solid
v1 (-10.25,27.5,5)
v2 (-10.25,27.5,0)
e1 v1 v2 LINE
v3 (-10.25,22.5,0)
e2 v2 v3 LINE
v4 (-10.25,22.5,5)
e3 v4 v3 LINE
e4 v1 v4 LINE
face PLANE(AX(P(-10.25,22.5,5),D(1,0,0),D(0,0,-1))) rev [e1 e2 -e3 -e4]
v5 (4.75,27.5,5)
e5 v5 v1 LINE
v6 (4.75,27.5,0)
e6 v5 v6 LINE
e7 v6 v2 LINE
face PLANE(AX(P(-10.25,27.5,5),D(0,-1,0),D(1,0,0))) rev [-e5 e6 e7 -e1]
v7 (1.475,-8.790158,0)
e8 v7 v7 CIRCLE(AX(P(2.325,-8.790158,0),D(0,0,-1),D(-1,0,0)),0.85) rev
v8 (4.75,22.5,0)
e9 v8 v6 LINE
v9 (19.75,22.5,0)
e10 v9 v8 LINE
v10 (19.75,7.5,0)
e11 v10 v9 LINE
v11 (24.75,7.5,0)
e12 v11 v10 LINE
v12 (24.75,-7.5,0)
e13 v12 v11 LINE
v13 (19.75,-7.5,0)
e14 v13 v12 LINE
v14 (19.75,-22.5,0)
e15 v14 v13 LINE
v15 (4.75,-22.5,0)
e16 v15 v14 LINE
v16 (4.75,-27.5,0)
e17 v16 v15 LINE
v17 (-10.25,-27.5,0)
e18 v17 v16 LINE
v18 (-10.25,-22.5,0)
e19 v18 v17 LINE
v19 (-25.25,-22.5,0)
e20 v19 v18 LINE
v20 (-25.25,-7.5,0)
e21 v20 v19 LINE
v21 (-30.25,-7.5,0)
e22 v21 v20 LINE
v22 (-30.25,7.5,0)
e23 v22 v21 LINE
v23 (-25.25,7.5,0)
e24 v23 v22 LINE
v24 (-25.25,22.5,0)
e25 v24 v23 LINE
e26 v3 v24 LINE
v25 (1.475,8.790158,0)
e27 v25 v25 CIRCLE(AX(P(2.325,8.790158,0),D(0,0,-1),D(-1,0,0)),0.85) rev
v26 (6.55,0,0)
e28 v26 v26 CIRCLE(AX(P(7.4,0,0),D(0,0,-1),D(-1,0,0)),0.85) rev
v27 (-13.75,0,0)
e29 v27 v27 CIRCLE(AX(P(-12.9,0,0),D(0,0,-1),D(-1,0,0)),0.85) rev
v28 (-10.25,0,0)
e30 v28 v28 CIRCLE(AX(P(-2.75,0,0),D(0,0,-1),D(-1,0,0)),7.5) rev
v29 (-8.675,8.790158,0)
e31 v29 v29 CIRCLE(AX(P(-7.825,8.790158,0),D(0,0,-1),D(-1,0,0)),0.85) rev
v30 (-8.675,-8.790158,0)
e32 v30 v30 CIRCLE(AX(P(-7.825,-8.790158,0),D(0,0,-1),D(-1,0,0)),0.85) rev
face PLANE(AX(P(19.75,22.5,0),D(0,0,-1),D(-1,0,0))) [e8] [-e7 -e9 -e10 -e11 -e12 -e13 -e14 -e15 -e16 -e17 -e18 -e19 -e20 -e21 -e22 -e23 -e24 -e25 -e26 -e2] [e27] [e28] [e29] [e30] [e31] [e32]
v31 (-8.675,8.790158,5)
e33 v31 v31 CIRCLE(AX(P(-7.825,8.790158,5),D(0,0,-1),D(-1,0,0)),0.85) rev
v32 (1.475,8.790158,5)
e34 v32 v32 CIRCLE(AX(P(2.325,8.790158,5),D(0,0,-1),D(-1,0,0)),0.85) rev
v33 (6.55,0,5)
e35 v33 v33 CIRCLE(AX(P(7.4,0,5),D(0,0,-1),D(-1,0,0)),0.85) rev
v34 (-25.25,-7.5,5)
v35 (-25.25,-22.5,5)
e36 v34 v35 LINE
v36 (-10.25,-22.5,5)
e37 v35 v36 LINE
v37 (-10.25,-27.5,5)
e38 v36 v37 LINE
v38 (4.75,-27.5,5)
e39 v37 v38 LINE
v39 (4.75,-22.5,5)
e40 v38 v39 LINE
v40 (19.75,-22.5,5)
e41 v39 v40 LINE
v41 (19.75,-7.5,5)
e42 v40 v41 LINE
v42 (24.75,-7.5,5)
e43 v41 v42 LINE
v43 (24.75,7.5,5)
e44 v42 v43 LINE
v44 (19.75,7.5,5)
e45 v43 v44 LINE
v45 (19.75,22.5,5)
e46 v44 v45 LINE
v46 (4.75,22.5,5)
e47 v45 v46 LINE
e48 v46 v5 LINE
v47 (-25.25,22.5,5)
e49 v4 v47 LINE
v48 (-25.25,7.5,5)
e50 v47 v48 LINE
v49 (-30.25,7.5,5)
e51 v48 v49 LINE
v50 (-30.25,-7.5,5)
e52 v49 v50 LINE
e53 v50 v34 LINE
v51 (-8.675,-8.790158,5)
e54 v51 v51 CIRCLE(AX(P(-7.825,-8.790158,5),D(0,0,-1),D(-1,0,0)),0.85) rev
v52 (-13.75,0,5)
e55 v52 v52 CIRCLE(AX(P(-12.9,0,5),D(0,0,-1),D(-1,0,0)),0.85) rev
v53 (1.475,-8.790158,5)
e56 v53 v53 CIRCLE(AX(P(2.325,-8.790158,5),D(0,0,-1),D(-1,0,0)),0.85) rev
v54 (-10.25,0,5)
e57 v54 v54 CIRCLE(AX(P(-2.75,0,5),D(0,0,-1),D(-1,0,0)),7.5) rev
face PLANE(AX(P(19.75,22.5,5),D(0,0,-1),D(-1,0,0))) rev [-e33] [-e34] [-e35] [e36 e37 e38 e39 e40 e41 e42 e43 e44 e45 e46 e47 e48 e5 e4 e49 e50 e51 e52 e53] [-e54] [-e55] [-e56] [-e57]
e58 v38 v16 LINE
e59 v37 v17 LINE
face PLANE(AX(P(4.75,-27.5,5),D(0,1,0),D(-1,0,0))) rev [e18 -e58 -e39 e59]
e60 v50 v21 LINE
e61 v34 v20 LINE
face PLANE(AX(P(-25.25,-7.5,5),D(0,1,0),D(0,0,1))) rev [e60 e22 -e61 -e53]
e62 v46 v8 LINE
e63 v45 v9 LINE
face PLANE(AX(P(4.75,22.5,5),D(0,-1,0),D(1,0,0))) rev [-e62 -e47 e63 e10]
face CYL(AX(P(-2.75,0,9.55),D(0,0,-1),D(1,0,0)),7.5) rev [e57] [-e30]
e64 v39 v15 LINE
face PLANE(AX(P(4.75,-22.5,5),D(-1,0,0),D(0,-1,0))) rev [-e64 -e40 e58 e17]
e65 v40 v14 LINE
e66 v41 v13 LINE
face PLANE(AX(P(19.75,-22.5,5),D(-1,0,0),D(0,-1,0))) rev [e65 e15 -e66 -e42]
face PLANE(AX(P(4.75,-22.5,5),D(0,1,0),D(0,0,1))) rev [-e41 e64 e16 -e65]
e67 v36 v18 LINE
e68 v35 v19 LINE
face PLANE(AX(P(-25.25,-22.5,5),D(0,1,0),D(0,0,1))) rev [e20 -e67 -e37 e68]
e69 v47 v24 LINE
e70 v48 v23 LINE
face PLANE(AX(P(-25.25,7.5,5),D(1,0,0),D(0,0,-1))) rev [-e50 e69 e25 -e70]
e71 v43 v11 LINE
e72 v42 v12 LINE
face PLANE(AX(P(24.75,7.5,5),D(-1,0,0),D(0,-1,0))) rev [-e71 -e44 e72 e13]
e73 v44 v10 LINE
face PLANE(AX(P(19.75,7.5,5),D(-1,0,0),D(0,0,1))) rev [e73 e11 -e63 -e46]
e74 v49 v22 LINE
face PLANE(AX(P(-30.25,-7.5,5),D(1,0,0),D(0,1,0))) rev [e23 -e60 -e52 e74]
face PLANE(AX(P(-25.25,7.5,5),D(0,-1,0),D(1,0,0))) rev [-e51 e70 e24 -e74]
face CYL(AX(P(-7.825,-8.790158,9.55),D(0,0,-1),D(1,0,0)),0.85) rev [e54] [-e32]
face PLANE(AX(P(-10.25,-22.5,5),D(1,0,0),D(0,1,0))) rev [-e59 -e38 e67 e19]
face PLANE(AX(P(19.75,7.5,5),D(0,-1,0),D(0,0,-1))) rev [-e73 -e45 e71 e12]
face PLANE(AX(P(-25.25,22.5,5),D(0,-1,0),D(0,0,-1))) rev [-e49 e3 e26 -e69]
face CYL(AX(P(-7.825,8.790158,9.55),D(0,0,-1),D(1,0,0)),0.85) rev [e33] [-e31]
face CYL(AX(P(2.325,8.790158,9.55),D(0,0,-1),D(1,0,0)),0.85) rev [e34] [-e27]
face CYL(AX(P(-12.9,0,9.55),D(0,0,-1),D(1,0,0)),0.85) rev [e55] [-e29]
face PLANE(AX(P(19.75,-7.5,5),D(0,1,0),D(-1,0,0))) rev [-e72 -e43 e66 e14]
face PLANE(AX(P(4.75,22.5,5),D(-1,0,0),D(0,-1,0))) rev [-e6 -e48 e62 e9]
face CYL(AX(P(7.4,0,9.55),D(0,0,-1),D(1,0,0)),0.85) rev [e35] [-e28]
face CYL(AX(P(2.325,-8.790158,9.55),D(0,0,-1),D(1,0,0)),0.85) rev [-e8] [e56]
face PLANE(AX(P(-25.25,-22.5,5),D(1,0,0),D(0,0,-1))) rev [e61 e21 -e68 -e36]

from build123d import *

# Parameters (mm, degrees)
BOSS_EXTRUDE1_DEPTH = 5
CAVITY1_OUTLINE_R   = 0.85
CAVITY1_OUTLINE_R_2 = 7.5
CAVITY1_DEPTH       = 5


# Read off the part's stored shape, not the designer's step: Cavity1
with BuildPart() as part:
    # Sketch1 → Boss-Extrude1 (new body)
    with BuildSketch(Plane.XY):
        Polygon((-25.25, 7.5), (-25.25, 22.5), (-10.25, 22.5), (-10.25, 27.5), (4.75, 27.5), (4.75, 22.5), (19.75, 22.5), (19.75, 7.5), (24.75, 7.5), (24.75, -7.5), (19.75, -7.5), (19.75, -22.5), (4.75, -22.5), (4.75, -27.5), (-10.25, -27.5), (-10.25, -22.5), (-25.25, -22.5), (-25.25, -7.5), (-30.25, -7.5), (-30.25, 7.5), align=None)
    extrude(amount=BOSS_EXTRUDE1_DEPTH)

    # Cavity1 outline → Cavity1 (cut)
    with BuildSketch(Plane.XY):
        with Locations((2.325, 8.790157848)):
            Circle(CAVITY1_OUTLINE_R)
        with Locations((-7.825, 8.790157848)):
            Circle(CAVITY1_OUTLINE_R)
        with Locations((-12.9, 0)):
            Circle(CAVITY1_OUTLINE_R)
        with Locations((-7.825, -8.790157848)):
            Circle(CAVITY1_OUTLINE_R)
        with Locations((2.325, -8.790157848)):
            Circle(CAVITY1_OUTLINE_R)
        with Locations((7.4, 0)):
            Circle(CAVITY1_OUTLINE_R)
        with Locations((-2.75, 0)):
            Circle(CAVITY1_OUTLINE_R_2)
    extrude(amount=CAVITY1_DEPTH, mode=Mode.SUBTRACT)


solid = part.part
